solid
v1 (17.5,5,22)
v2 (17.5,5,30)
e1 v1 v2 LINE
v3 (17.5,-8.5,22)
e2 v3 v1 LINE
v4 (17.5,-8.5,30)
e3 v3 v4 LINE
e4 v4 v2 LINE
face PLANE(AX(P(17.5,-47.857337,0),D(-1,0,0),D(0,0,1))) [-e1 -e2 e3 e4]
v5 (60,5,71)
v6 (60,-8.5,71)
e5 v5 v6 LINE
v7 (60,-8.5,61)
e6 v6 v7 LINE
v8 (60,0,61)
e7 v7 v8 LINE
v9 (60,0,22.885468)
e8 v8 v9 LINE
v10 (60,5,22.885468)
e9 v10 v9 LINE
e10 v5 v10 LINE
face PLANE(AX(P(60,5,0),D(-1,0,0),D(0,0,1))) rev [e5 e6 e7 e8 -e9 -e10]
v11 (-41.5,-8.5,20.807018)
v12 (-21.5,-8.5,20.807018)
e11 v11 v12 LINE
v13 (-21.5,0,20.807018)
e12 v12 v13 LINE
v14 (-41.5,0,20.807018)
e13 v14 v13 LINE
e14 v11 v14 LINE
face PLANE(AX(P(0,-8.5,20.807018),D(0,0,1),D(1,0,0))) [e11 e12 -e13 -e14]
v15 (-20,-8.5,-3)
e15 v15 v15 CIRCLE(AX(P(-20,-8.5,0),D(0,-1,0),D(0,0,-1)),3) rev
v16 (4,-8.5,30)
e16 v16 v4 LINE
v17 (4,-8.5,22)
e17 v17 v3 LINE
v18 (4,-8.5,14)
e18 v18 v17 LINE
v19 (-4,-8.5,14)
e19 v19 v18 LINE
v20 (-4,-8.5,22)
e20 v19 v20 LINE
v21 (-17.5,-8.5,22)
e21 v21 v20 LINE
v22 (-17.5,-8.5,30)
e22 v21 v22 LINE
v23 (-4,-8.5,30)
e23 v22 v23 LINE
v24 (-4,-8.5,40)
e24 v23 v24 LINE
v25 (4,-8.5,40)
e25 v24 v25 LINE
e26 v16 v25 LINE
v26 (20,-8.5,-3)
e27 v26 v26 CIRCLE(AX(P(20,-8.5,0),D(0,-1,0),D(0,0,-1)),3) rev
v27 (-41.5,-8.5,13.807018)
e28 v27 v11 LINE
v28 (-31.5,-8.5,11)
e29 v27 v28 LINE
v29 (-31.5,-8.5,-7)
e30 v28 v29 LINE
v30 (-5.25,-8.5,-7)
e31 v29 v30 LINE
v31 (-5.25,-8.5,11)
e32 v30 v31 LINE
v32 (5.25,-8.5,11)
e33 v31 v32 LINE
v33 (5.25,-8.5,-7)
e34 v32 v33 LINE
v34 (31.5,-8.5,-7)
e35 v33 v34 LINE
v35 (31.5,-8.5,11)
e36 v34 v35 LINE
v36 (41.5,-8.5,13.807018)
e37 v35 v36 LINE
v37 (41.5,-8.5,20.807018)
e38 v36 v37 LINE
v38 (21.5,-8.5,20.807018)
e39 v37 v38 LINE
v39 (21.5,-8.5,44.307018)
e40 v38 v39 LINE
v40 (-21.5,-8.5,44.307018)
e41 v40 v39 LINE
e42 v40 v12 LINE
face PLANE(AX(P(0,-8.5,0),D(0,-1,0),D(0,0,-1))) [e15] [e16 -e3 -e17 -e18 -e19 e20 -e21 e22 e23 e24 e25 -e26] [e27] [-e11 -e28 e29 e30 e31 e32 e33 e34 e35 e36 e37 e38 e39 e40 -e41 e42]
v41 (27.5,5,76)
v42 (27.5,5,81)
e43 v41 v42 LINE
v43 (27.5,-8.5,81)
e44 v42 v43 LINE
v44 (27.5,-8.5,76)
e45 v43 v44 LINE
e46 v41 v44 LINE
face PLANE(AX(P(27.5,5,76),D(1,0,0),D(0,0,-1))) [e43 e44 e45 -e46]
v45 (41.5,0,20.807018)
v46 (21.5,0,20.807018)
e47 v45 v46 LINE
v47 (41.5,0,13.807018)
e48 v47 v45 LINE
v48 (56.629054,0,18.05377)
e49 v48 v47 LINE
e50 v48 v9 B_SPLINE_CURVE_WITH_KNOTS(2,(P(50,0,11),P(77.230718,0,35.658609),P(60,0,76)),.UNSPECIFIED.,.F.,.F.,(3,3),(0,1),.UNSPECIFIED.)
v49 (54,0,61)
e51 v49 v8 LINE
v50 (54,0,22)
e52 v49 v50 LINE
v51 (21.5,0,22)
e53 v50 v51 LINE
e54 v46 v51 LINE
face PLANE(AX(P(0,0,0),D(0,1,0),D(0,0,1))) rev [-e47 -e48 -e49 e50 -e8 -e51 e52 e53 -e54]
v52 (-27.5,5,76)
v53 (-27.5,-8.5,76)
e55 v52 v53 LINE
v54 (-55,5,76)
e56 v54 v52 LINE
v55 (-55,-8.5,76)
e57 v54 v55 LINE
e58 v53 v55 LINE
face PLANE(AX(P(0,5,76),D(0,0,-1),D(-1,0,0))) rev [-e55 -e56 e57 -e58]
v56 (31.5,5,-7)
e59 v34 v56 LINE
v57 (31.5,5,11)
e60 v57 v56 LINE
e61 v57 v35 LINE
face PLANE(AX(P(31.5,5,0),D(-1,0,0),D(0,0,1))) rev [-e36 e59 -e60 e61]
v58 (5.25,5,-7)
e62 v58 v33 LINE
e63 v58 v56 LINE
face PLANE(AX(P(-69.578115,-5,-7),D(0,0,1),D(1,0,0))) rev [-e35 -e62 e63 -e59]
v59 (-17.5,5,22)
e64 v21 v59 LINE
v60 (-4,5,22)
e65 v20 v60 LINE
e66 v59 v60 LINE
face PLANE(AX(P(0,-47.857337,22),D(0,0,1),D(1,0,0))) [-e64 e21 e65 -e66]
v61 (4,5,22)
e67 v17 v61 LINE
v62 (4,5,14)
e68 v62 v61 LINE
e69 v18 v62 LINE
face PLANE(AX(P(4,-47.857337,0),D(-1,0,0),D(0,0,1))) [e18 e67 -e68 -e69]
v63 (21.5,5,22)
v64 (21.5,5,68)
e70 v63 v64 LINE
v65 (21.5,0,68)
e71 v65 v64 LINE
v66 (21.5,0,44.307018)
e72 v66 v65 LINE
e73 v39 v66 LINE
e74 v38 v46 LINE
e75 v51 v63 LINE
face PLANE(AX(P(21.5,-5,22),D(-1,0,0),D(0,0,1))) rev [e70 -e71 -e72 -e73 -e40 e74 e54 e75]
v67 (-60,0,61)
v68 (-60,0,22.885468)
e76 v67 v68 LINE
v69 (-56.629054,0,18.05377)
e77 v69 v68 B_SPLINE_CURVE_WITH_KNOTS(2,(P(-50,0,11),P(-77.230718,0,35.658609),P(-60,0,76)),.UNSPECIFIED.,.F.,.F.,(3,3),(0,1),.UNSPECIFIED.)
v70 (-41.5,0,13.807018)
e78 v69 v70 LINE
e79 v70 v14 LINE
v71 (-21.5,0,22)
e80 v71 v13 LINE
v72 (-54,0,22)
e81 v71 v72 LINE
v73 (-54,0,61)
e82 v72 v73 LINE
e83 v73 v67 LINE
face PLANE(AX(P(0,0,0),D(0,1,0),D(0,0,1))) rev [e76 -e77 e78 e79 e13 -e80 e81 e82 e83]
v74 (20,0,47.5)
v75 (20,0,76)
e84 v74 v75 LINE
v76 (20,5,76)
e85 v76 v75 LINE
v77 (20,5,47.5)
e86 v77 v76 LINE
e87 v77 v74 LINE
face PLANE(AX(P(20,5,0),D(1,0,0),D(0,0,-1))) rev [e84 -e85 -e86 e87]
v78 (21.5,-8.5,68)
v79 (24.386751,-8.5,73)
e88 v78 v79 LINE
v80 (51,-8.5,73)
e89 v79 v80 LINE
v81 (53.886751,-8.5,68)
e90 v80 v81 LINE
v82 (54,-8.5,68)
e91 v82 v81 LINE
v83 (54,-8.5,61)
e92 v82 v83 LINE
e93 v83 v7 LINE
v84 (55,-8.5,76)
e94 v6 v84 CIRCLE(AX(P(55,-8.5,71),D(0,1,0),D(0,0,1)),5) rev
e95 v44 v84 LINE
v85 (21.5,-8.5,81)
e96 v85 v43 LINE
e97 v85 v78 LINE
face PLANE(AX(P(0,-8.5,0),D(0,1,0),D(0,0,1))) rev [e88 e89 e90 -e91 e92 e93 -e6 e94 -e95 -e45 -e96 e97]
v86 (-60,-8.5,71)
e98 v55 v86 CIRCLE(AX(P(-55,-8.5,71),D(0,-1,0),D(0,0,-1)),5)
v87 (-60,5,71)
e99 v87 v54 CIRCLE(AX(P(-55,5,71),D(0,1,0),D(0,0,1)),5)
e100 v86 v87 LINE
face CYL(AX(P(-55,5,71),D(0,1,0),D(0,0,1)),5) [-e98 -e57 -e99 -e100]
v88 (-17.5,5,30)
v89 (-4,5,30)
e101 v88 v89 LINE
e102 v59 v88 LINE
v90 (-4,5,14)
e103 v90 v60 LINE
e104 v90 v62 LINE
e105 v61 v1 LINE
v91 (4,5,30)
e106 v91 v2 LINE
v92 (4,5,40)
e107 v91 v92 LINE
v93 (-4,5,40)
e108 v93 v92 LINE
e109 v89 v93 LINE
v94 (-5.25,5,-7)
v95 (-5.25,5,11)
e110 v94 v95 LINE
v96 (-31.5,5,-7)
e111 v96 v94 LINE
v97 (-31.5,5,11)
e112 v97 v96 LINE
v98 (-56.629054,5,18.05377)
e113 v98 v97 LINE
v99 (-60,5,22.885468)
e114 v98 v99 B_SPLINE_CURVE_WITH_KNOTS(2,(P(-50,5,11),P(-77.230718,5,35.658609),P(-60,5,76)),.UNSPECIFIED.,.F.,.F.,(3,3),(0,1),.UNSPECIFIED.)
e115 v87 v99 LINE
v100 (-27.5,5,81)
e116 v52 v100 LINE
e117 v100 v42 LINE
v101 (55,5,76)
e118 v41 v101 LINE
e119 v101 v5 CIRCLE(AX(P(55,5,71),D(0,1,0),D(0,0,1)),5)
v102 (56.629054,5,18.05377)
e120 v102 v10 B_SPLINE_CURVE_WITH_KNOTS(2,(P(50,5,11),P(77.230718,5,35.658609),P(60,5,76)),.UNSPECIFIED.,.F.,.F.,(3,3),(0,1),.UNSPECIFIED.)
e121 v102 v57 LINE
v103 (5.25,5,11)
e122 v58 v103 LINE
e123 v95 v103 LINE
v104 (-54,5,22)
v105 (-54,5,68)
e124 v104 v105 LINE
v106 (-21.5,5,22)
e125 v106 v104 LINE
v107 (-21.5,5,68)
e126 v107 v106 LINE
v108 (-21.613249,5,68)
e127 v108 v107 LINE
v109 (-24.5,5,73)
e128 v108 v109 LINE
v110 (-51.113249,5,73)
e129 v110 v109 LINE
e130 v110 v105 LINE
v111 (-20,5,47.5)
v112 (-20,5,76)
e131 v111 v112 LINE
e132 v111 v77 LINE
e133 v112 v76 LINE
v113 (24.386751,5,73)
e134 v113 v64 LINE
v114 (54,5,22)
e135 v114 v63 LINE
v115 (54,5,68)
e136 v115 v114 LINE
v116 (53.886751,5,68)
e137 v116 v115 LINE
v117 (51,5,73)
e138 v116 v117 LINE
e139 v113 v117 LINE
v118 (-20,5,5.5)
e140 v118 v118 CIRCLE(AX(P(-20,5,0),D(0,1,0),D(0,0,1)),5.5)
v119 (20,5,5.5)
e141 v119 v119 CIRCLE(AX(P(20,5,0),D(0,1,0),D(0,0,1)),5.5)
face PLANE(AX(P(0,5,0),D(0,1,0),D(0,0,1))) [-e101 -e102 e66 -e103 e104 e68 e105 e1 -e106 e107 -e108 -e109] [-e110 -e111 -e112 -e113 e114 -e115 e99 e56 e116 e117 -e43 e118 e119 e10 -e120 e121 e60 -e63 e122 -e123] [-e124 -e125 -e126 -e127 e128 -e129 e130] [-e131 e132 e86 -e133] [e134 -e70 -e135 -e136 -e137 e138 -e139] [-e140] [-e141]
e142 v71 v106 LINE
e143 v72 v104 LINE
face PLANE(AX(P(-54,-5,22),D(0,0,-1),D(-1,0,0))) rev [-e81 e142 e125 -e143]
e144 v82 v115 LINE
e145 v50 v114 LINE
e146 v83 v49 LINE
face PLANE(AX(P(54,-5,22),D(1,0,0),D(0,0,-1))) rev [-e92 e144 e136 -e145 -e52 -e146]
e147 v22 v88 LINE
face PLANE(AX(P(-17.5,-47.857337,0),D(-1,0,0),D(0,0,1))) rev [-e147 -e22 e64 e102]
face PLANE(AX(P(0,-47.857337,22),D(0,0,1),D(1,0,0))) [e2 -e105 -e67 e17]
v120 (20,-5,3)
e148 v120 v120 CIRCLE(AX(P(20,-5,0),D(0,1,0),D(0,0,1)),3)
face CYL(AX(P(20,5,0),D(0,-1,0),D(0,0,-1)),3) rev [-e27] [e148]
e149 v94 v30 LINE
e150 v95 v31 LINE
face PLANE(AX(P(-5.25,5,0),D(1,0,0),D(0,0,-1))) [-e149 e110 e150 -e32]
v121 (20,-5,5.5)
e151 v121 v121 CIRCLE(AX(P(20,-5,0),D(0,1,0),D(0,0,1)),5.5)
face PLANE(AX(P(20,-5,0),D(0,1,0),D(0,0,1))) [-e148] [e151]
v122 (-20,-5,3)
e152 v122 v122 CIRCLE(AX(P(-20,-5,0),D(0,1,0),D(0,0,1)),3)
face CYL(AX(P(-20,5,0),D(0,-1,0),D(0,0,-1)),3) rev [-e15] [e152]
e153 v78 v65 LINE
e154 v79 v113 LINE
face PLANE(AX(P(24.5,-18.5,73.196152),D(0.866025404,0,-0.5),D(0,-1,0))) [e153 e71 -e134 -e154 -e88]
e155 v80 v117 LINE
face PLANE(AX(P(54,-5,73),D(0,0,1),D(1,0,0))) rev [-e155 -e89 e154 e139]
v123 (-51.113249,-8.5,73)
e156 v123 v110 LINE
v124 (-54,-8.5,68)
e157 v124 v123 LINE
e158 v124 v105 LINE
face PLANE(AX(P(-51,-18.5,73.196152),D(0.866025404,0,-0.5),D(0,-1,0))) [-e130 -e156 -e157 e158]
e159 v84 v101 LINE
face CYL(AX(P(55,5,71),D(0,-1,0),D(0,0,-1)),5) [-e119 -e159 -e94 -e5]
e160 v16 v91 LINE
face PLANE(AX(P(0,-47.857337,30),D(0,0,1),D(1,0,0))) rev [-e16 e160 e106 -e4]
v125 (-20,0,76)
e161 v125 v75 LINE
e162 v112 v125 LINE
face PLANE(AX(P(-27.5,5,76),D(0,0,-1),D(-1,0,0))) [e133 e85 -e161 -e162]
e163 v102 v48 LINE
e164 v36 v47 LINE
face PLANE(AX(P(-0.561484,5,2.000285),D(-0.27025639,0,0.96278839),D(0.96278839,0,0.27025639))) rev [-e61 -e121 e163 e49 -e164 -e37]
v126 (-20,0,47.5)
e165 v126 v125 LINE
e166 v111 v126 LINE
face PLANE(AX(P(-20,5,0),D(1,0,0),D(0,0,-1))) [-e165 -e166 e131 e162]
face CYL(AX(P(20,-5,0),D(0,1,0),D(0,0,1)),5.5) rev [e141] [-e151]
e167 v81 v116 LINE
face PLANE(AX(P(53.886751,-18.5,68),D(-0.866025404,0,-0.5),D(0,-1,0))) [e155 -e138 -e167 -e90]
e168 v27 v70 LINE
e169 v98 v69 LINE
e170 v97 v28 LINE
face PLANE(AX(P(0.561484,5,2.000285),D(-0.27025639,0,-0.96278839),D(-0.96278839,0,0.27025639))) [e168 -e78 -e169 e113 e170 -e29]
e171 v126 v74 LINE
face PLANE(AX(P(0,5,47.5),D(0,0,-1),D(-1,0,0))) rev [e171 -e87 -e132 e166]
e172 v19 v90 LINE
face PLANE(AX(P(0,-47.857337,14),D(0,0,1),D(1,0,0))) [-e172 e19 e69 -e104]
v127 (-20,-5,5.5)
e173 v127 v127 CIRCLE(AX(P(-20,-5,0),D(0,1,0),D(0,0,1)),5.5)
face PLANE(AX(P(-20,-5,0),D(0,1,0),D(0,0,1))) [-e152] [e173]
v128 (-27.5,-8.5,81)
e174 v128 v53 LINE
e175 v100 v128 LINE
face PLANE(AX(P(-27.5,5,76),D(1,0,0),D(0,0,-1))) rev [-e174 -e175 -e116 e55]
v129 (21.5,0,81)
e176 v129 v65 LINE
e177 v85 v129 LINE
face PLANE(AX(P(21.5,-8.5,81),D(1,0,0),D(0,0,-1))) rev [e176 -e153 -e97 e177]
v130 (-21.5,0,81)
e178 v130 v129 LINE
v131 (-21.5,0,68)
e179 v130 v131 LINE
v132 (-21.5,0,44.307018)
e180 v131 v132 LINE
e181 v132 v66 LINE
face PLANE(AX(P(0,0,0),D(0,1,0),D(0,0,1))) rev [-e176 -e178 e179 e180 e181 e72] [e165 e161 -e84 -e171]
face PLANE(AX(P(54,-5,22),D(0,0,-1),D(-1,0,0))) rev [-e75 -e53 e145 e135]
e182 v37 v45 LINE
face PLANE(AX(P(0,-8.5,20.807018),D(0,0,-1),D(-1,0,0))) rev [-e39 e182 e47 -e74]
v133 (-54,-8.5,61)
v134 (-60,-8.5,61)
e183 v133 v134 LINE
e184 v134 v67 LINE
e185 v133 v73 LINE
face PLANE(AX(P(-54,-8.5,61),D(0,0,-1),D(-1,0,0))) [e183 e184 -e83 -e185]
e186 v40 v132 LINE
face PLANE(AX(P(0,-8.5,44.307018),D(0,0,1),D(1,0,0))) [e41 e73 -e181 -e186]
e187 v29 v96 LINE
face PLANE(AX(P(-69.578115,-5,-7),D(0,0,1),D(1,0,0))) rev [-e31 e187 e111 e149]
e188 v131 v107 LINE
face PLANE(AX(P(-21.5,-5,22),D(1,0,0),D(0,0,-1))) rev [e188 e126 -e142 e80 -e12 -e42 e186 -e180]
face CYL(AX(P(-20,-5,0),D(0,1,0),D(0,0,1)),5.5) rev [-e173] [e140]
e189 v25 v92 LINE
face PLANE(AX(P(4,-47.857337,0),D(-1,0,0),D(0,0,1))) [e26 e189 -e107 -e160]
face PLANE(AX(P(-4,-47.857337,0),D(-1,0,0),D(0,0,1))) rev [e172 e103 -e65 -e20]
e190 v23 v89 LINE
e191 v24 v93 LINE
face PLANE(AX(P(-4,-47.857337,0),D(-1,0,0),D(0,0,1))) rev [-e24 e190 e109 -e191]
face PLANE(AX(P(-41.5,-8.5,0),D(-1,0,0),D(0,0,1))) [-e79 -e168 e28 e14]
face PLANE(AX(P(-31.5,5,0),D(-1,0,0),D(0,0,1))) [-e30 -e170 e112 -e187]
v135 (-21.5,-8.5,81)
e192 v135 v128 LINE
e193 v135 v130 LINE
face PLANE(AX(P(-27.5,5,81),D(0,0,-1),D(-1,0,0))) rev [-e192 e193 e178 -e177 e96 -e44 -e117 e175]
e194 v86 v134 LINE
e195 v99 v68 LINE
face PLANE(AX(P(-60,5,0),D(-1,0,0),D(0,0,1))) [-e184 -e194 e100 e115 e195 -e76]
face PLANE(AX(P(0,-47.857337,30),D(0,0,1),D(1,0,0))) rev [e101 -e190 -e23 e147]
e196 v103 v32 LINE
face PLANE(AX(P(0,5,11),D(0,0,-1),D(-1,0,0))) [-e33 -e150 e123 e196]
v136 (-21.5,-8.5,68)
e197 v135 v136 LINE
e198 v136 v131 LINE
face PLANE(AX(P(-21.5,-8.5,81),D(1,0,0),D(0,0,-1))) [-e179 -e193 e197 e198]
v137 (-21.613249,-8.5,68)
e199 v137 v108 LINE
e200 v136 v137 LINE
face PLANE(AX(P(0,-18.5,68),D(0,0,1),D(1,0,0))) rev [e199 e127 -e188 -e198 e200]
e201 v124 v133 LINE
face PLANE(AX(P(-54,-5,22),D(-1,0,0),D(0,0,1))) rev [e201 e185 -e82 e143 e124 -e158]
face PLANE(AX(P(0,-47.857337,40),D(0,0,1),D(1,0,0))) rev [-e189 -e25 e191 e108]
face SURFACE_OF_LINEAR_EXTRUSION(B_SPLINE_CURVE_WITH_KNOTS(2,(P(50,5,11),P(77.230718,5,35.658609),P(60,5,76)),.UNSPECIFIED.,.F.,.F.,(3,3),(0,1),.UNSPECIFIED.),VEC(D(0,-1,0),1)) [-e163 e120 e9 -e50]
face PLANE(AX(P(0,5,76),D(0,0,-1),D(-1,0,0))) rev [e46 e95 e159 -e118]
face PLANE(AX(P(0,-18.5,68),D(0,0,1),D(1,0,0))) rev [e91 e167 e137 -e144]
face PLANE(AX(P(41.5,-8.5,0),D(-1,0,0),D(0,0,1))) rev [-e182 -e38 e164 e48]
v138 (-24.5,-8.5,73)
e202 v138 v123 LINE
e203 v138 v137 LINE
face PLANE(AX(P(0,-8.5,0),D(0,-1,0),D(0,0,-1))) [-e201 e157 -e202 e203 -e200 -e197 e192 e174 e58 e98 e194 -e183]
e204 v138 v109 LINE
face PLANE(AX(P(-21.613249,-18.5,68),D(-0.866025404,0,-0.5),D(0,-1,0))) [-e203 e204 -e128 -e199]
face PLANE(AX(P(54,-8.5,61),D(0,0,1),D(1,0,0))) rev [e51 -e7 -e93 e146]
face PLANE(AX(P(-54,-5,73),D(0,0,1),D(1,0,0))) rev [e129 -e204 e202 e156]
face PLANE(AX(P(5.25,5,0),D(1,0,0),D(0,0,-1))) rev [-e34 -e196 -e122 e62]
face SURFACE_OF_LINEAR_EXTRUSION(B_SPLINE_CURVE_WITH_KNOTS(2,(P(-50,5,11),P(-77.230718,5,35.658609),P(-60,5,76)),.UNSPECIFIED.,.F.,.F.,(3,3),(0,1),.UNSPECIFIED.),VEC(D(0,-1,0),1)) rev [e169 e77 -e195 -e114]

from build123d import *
from OCP.BRepFilletAPI import BRepFilletAPI_MakeChamfer
from build123d.topology import SkipClean

# Parameters (mm, degrees)
SKETCH1_W           = 40
SKETCH1_H           = 28.5
SKETCH1_R           = 3
BOSS_EXTRUDE1_DEPTH = 5
SKETCH2_W           = 32.5
SKETCH2_H           = 51
CUT_EXTRUDE1_DEPTH  = 10
SKETCH3_W           = 137.62708118
SKETCH3_H           = 29.533708408
CUT_EXTRUDE2_DEPTH  = 10
BOSS_EXTRUDE2_START = 8.5
SKETCH4_R           = 3
BOSS_EXTRUDE2_DEPTH = 8.5
FILLET1_R           = 5
SKETCH5_W           = 8
SKETCH5_H           = 8
SKETCH5_W_2         = 35
SKETCH5_H_2         = 10
CUT_EXTRUDE3_DEPTH  = 13.5
BOSS_EXTRUDE6_START = -13.5
SKETCH6_W           = 3
SKETCH6_H           = 5
BOSS_EXTRUDE6_DEPTH = 13.5
CUT_EXTRUDE4_START  = -10
SKETCH7_R           = 5.5
SKETCH7_R_2         = 3
CUT_EXTRUDE4_DEPTH  = 10
CHAMFER1_SIZE       = 5
CHAMFER1_SIZE_2     = 2.886751346
CHAMFER2_SIZE       = 5.196152423
CHAMFER2_SIZE_2     = 3


# Some blends are built 0.0001 mm under size
with BuildPart() as part:
    # Sketch1 → Boss-Extrude1 (new body)
    with BuildSketch(Plane(origin=(0, 0, 0), x_dir=(1, 0, 0), z_dir=(0, 1, 0))):
        with BuildLine():
            Line((-31.5, 11), (-31.5, -11))
            Line((-31.5, -11), (-56.629054395, -18.053769655))
            add(Edge.make_bspline(
                [(-56.629054395, -18.053769655), (-58.486129852, -20.409089771), (-60, -22.885467918)],
                knots=[0.137055219, 0.137055219, 0.137055219, 0.224914017, 0.224914017, 0.224914017], degree=2))
            Line((-60, -22.885467918), (-60, -76))
            Line((-60, -76), (-27.5, -76))
            Line((-27.5, -76), (-27.5, -81))
            Line((-27.5, -81), (27.5, -81))
            Line((27.5, -81), (27.5, -76))
            Line((27.5, -76), (60, -76))
            Line((60, -76), (60, -22.885467918))
            add(Edge.make_bspline(
                [(56.629054395, -18.053769655), (58.486129852, -20.409089771), (60, -22.885467918)],
                knots=[0.137055219, 0.137055219, 0.137055219, 0.224914017, 0.224914017, 0.224914017], degree=2))
            Line((56.629054395, -18.053769655), (31.5, -11))
            Line((31.5, -11), (31.5, 11))
            Line((31.5, 11), (5.25, 11))
            Line((5.25, 11), (5.25, -11))
            Line((5.25, -11), (-5.25, -11))
            Line((-5.25, -11), (-5.25, 11))
            Line((-5.25, 11), (-31.5, 11))
        make_face()
        with Locations((0, -61.75)):
            Rectangle(SKETCH1_W, SKETCH1_H, mode=Mode.SUBTRACT)
        with Locations(Location((-20, 0, 0), (0, 0, 270))):
            Circle(SKETCH1_R, mode=Mode.SUBTRACT)
        with Locations(Location((20, 0, 0), (0, 0, 270))):
            Circle(SKETCH1_R, mode=Mode.SUBTRACT)
    extrude(amount=BOSS_EXTRUDE1_DEPTH)

    # Sketch2 → Cut-Extrude1 (cut)
    with BuildSketch(Plane(origin=(0, 5, 0), x_dir=(1, 0, 0), z_dir=(0, 1, 0))):
        with Locations((-37.75, -47.5)):
            Rectangle(SKETCH2_W, SKETCH2_H)
        with Locations((37.75, -47.5)):
            Rectangle(SKETCH2_W, SKETCH2_H)
    extrude(amount=-CUT_EXTRUDE1_DEPTH, mode=Mode.SUBTRACT)

    # Sketch3 → Cut-Extrude2 (cut)
    with BuildSketch(Plane(origin=(0, 5, 0), x_dir=(1, 0, 0), z_dir=(0, 1, 0))):
        with Locations((-0.764574483, 21.766854204)):
            Rectangle(SKETCH3_W, SKETCH3_H)
    extrude(amount=-CUT_EXTRUDE2_DEPTH, mode=Mode.SUBTRACT)

    # Sketch4 → Boss-Extrude2 (add)
    # profile 1 of 3: a face of its own
    with SkipClean():  # the faces are left unmerged after this step: merging them gives an invalid solid
        with BuildSketch(Plane.XZ.offset(BOSS_EXTRUDE2_START)):
            Polygon((-41.5, 20.807017544), (-41.5, 13.807017544), (-31.5, 11), (-31.5, -7), (-5.25, -7), (-5.25, 11), (5.25, 11), (5.25, -7), (31.5, -7), (31.5, 11), (41.5, 13.807017544), (41.5, 20.807017544), (21.5, 20.807017544), (21.5, 44.307017544), (-21.5, 44.307017544), (-21.5, 20.807017544), align=None)
            with Locations(Location((-20, 0, 0), (0, 0, 270))):
                Circle(SKETCH4_R, mode=Mode.SUBTRACT)
            with Locations(Location((20, 0, 0), (0, 0, 270))):
                Circle(SKETCH4_R, mode=Mode.SUBTRACT)
        # profile 2 of 3: a face of its own
        with BuildSketch(Plane.XZ.offset(BOSS_EXTRUDE2_START)):
            Polygon((-60, 61), (-54, 61), (-54, 73), (-21.5, 73), (-21.5, 81), (-27.5, 81), (-27.5, 76), (-60, 76), align=None)
        # profile 3 of 3: a face of its own
        with BuildSketch(Plane.XZ.offset(BOSS_EXTRUDE2_START)):
            Polygon((27.5, 81), (21.5, 81), (21.5, 73), (54, 73), (54, 61), (60, 61), (59.999999958, 73), (60, 76), (27.5, 76), align=None)
        extrude(amount=-BOSS_EXTRUDE2_DEPTH)

    # Fillet1
    fillet1_edges = [part.edges().sort_by_distance(p)[0] for p in [
        (60, -4.25, 76),
        (-60, -4.25, 76),
    ]]
    fillet(fillet1_edges, radius=FILLET1_R)

    # Sketch5 → Cut-Extrude3 (cut)
    with SkipClean():  # the faces are left unmerged after this step: merging them gives an invalid solid
        with BuildSketch(Plane(origin=(0, 5, 0), x_dir=(1, 0, 0), z_dir=(0, 1, 0))):
            with Locations((0, -18)):
                Rectangle(SKETCH5_W, SKETCH5_H)
            with Locations((0, -26)):
                Rectangle(SKETCH5_W_2, SKETCH5_H)
            with Locations((0, -35)):
                Rectangle(SKETCH5_W, SKETCH5_H_2)
        extrude(amount=-CUT_EXTRUDE3_DEPTH, mode=Mode.SUBTRACT)

    # Sketch6 → Boss-Extrude6 (add)
    with SkipClean():  # the faces are left unmerged after this step: merging them gives an invalid solid
        with BuildSketch(Plane(origin=(0, 5, 0), x_dir=(1, 0, 0), z_dir=(0, 1, 0)).offset(BOSS_EXTRUDE6_START)):
            with Locations((-52.5, -70.5)):
                Rectangle(SKETCH6_W, SKETCH6_H)
            with Locations((-23, -70.5)):
                Rectangle(SKETCH6_W, SKETCH6_H)
            Polygon((-21.5, -73), (-24.5, -73), (-27.5, -73), (-27.5, -76), (-21.5, -76), align=None)
            with Locations((23, -70.5)):
                Rectangle(SKETCH6_W, SKETCH6_H)
            Polygon((27.5, -73), (24.5, -73), (21.5, -73), (21.5, -76), (27.5, -76), align=None)
            with Locations((52.5, -70.5)):
                Rectangle(SKETCH6_W, SKETCH6_H)
        extrude(amount=BOSS_EXTRUDE6_DEPTH)

    # Sketch7 → Cut-Extrude4 (cut)
    # profile 1 of 2: a face of its own
    with BuildSketch(Plane(origin=(0, 5, 0), x_dir=(1, 0, 0), z_dir=(0, 1, 0)).offset(CUT_EXTRUDE4_START)):
        with Locations(Location((-20, 0, 0), (0, 0, 270))):
            Circle(SKETCH7_R)
        with Locations(Location((-20, 0, 0), (0, 0, 90))):
            Circle(SKETCH7_R_2, mode=Mode.SUBTRACT)
    # profile 2 of 2: a face of its own
    with BuildSketch(Plane(origin=(0, 5, 0), x_dir=(1, 0, 0), z_dir=(0, 1, 0)).offset(CUT_EXTRUDE4_START)):
        with Locations(Location((20, 0, 0), (0, 0, 270))):
            Circle(SKETCH7_R)
        with Locations(Location((20, 0, 0), (0, 0, 90))):
            Circle(SKETCH7_R_2, mode=Mode.SUBTRACT)
    extrude(amount=CUT_EXTRUDE4_DEPTH, mode=Mode.SUBTRACT)

    # Chamfer1
    chamfer1_edges_1 = [part.edges().sort_by_distance(p)[0] for p in [
        (51, -1.75, 68),
    ]]
    chamfer1_side_1 = [part.faces().sort_by_distance(p)[0] for p in [
        (51, -1.75, 68.057735027),
    ]]
    chamfer1_edges_2 = [part.edges().sort_by_distance(p)[0] for p in [
        (-24.5, -1.75, 68),
    ]]
    chamfer1_side_2 = [part.faces().sort_by_distance(p)[0] for p in [
        (-24.5, -1.75, 68.057735027),
    ]]
    chamfer1 = BRepFilletAPI_MakeChamfer(part.part.solid().wrapped)
    for e in chamfer1_edges_1:
        chamfer1.Add(CHAMFER1_SIZE - 0.0001, CHAMFER1_SIZE_2 - 0.0001, e.wrapped, chamfer1_side_1[0].wrapped)
    for e in chamfer1_edges_2:
        chamfer1.Add(CHAMFER1_SIZE - 0.0001, CHAMFER1_SIZE_2 - 0.0001, e.wrapped, chamfer1_side_2[0].wrapped)
    add(Compound.cast(chamfer1.Shape()), mode=Mode.REPLACE)  # a hair under: the kernel refuses the full size

    # Chamfer2
    # the kernel refuses this chamfer: 5.196152423, 3 mm, written as the material it takes off along each edge
    with BuildSketch(Plane(origin=(-51, -21.942891912, 68), x_dir=(0.01932676561269968, 0, 0.9998132206222079), z_dir=(0, 1, 0))) as chamfer2_piece_1_section:
        Polygon((CHAMFER2_SIZE * 0.999813220566, -CHAMFER2_SIZE * 0.0193267656116), (-CHAMFER2_SIZE_2 * 0.0193267656127, -CHAMFER2_SIZE_2 * 0.999813220622), (0, 0), align=None)
    chamfer2_piece_1 = extrude(amount=40.385783824, mode=Mode.PRIVATE)
    chamfer2_piece_1 = split(chamfer2_piece_1, bisect_by=Plane(origin=(-51.966537061, -1.75, 73), z_dir=(0, 0, -1)), keep=Keep.TOP, mode=Mode.PRIVATE)
    chamfer2_piece_1 = split(chamfer2_piece_1, bisect_by=Plane(origin=(-54, -1.75, 69.717275258), z_dir=(1, 0, 0)), keep=Keep.TOP, mode=Mode.PRIVATE)
    add(chamfer2_piece_1, mode=Mode.SUBTRACT)
    with BuildSketch(Plane(origin=(24.5, -21.942891912, 68), x_dir=(0.019326765612701, 0, 0.9998132206222079), z_dir=(0, 1, 0))) as chamfer2_piece_2_section:
        Polygon((CHAMFER2_SIZE * 0.999813220566, -CHAMFER2_SIZE * 0.0193267656116), (-CHAMFER2_SIZE_2 * 0.0193267656127, -CHAMFER2_SIZE_2 * 0.999813220622), (0, 0), align=None)
    chamfer2_piece_2 = extrude(amount=40.385783824, mode=Mode.PRIVATE)
    chamfer2_piece_2 = split(chamfer2_piece_2, bisect_by=Plane(origin=(23.533462939, -1.75, 73), z_dir=(0, 0, -1)), keep=Keep.TOP, mode=Mode.PRIVATE)
    add(chamfer2_piece_2, mode=Mode.SUBTRACT)


solid = part.part
